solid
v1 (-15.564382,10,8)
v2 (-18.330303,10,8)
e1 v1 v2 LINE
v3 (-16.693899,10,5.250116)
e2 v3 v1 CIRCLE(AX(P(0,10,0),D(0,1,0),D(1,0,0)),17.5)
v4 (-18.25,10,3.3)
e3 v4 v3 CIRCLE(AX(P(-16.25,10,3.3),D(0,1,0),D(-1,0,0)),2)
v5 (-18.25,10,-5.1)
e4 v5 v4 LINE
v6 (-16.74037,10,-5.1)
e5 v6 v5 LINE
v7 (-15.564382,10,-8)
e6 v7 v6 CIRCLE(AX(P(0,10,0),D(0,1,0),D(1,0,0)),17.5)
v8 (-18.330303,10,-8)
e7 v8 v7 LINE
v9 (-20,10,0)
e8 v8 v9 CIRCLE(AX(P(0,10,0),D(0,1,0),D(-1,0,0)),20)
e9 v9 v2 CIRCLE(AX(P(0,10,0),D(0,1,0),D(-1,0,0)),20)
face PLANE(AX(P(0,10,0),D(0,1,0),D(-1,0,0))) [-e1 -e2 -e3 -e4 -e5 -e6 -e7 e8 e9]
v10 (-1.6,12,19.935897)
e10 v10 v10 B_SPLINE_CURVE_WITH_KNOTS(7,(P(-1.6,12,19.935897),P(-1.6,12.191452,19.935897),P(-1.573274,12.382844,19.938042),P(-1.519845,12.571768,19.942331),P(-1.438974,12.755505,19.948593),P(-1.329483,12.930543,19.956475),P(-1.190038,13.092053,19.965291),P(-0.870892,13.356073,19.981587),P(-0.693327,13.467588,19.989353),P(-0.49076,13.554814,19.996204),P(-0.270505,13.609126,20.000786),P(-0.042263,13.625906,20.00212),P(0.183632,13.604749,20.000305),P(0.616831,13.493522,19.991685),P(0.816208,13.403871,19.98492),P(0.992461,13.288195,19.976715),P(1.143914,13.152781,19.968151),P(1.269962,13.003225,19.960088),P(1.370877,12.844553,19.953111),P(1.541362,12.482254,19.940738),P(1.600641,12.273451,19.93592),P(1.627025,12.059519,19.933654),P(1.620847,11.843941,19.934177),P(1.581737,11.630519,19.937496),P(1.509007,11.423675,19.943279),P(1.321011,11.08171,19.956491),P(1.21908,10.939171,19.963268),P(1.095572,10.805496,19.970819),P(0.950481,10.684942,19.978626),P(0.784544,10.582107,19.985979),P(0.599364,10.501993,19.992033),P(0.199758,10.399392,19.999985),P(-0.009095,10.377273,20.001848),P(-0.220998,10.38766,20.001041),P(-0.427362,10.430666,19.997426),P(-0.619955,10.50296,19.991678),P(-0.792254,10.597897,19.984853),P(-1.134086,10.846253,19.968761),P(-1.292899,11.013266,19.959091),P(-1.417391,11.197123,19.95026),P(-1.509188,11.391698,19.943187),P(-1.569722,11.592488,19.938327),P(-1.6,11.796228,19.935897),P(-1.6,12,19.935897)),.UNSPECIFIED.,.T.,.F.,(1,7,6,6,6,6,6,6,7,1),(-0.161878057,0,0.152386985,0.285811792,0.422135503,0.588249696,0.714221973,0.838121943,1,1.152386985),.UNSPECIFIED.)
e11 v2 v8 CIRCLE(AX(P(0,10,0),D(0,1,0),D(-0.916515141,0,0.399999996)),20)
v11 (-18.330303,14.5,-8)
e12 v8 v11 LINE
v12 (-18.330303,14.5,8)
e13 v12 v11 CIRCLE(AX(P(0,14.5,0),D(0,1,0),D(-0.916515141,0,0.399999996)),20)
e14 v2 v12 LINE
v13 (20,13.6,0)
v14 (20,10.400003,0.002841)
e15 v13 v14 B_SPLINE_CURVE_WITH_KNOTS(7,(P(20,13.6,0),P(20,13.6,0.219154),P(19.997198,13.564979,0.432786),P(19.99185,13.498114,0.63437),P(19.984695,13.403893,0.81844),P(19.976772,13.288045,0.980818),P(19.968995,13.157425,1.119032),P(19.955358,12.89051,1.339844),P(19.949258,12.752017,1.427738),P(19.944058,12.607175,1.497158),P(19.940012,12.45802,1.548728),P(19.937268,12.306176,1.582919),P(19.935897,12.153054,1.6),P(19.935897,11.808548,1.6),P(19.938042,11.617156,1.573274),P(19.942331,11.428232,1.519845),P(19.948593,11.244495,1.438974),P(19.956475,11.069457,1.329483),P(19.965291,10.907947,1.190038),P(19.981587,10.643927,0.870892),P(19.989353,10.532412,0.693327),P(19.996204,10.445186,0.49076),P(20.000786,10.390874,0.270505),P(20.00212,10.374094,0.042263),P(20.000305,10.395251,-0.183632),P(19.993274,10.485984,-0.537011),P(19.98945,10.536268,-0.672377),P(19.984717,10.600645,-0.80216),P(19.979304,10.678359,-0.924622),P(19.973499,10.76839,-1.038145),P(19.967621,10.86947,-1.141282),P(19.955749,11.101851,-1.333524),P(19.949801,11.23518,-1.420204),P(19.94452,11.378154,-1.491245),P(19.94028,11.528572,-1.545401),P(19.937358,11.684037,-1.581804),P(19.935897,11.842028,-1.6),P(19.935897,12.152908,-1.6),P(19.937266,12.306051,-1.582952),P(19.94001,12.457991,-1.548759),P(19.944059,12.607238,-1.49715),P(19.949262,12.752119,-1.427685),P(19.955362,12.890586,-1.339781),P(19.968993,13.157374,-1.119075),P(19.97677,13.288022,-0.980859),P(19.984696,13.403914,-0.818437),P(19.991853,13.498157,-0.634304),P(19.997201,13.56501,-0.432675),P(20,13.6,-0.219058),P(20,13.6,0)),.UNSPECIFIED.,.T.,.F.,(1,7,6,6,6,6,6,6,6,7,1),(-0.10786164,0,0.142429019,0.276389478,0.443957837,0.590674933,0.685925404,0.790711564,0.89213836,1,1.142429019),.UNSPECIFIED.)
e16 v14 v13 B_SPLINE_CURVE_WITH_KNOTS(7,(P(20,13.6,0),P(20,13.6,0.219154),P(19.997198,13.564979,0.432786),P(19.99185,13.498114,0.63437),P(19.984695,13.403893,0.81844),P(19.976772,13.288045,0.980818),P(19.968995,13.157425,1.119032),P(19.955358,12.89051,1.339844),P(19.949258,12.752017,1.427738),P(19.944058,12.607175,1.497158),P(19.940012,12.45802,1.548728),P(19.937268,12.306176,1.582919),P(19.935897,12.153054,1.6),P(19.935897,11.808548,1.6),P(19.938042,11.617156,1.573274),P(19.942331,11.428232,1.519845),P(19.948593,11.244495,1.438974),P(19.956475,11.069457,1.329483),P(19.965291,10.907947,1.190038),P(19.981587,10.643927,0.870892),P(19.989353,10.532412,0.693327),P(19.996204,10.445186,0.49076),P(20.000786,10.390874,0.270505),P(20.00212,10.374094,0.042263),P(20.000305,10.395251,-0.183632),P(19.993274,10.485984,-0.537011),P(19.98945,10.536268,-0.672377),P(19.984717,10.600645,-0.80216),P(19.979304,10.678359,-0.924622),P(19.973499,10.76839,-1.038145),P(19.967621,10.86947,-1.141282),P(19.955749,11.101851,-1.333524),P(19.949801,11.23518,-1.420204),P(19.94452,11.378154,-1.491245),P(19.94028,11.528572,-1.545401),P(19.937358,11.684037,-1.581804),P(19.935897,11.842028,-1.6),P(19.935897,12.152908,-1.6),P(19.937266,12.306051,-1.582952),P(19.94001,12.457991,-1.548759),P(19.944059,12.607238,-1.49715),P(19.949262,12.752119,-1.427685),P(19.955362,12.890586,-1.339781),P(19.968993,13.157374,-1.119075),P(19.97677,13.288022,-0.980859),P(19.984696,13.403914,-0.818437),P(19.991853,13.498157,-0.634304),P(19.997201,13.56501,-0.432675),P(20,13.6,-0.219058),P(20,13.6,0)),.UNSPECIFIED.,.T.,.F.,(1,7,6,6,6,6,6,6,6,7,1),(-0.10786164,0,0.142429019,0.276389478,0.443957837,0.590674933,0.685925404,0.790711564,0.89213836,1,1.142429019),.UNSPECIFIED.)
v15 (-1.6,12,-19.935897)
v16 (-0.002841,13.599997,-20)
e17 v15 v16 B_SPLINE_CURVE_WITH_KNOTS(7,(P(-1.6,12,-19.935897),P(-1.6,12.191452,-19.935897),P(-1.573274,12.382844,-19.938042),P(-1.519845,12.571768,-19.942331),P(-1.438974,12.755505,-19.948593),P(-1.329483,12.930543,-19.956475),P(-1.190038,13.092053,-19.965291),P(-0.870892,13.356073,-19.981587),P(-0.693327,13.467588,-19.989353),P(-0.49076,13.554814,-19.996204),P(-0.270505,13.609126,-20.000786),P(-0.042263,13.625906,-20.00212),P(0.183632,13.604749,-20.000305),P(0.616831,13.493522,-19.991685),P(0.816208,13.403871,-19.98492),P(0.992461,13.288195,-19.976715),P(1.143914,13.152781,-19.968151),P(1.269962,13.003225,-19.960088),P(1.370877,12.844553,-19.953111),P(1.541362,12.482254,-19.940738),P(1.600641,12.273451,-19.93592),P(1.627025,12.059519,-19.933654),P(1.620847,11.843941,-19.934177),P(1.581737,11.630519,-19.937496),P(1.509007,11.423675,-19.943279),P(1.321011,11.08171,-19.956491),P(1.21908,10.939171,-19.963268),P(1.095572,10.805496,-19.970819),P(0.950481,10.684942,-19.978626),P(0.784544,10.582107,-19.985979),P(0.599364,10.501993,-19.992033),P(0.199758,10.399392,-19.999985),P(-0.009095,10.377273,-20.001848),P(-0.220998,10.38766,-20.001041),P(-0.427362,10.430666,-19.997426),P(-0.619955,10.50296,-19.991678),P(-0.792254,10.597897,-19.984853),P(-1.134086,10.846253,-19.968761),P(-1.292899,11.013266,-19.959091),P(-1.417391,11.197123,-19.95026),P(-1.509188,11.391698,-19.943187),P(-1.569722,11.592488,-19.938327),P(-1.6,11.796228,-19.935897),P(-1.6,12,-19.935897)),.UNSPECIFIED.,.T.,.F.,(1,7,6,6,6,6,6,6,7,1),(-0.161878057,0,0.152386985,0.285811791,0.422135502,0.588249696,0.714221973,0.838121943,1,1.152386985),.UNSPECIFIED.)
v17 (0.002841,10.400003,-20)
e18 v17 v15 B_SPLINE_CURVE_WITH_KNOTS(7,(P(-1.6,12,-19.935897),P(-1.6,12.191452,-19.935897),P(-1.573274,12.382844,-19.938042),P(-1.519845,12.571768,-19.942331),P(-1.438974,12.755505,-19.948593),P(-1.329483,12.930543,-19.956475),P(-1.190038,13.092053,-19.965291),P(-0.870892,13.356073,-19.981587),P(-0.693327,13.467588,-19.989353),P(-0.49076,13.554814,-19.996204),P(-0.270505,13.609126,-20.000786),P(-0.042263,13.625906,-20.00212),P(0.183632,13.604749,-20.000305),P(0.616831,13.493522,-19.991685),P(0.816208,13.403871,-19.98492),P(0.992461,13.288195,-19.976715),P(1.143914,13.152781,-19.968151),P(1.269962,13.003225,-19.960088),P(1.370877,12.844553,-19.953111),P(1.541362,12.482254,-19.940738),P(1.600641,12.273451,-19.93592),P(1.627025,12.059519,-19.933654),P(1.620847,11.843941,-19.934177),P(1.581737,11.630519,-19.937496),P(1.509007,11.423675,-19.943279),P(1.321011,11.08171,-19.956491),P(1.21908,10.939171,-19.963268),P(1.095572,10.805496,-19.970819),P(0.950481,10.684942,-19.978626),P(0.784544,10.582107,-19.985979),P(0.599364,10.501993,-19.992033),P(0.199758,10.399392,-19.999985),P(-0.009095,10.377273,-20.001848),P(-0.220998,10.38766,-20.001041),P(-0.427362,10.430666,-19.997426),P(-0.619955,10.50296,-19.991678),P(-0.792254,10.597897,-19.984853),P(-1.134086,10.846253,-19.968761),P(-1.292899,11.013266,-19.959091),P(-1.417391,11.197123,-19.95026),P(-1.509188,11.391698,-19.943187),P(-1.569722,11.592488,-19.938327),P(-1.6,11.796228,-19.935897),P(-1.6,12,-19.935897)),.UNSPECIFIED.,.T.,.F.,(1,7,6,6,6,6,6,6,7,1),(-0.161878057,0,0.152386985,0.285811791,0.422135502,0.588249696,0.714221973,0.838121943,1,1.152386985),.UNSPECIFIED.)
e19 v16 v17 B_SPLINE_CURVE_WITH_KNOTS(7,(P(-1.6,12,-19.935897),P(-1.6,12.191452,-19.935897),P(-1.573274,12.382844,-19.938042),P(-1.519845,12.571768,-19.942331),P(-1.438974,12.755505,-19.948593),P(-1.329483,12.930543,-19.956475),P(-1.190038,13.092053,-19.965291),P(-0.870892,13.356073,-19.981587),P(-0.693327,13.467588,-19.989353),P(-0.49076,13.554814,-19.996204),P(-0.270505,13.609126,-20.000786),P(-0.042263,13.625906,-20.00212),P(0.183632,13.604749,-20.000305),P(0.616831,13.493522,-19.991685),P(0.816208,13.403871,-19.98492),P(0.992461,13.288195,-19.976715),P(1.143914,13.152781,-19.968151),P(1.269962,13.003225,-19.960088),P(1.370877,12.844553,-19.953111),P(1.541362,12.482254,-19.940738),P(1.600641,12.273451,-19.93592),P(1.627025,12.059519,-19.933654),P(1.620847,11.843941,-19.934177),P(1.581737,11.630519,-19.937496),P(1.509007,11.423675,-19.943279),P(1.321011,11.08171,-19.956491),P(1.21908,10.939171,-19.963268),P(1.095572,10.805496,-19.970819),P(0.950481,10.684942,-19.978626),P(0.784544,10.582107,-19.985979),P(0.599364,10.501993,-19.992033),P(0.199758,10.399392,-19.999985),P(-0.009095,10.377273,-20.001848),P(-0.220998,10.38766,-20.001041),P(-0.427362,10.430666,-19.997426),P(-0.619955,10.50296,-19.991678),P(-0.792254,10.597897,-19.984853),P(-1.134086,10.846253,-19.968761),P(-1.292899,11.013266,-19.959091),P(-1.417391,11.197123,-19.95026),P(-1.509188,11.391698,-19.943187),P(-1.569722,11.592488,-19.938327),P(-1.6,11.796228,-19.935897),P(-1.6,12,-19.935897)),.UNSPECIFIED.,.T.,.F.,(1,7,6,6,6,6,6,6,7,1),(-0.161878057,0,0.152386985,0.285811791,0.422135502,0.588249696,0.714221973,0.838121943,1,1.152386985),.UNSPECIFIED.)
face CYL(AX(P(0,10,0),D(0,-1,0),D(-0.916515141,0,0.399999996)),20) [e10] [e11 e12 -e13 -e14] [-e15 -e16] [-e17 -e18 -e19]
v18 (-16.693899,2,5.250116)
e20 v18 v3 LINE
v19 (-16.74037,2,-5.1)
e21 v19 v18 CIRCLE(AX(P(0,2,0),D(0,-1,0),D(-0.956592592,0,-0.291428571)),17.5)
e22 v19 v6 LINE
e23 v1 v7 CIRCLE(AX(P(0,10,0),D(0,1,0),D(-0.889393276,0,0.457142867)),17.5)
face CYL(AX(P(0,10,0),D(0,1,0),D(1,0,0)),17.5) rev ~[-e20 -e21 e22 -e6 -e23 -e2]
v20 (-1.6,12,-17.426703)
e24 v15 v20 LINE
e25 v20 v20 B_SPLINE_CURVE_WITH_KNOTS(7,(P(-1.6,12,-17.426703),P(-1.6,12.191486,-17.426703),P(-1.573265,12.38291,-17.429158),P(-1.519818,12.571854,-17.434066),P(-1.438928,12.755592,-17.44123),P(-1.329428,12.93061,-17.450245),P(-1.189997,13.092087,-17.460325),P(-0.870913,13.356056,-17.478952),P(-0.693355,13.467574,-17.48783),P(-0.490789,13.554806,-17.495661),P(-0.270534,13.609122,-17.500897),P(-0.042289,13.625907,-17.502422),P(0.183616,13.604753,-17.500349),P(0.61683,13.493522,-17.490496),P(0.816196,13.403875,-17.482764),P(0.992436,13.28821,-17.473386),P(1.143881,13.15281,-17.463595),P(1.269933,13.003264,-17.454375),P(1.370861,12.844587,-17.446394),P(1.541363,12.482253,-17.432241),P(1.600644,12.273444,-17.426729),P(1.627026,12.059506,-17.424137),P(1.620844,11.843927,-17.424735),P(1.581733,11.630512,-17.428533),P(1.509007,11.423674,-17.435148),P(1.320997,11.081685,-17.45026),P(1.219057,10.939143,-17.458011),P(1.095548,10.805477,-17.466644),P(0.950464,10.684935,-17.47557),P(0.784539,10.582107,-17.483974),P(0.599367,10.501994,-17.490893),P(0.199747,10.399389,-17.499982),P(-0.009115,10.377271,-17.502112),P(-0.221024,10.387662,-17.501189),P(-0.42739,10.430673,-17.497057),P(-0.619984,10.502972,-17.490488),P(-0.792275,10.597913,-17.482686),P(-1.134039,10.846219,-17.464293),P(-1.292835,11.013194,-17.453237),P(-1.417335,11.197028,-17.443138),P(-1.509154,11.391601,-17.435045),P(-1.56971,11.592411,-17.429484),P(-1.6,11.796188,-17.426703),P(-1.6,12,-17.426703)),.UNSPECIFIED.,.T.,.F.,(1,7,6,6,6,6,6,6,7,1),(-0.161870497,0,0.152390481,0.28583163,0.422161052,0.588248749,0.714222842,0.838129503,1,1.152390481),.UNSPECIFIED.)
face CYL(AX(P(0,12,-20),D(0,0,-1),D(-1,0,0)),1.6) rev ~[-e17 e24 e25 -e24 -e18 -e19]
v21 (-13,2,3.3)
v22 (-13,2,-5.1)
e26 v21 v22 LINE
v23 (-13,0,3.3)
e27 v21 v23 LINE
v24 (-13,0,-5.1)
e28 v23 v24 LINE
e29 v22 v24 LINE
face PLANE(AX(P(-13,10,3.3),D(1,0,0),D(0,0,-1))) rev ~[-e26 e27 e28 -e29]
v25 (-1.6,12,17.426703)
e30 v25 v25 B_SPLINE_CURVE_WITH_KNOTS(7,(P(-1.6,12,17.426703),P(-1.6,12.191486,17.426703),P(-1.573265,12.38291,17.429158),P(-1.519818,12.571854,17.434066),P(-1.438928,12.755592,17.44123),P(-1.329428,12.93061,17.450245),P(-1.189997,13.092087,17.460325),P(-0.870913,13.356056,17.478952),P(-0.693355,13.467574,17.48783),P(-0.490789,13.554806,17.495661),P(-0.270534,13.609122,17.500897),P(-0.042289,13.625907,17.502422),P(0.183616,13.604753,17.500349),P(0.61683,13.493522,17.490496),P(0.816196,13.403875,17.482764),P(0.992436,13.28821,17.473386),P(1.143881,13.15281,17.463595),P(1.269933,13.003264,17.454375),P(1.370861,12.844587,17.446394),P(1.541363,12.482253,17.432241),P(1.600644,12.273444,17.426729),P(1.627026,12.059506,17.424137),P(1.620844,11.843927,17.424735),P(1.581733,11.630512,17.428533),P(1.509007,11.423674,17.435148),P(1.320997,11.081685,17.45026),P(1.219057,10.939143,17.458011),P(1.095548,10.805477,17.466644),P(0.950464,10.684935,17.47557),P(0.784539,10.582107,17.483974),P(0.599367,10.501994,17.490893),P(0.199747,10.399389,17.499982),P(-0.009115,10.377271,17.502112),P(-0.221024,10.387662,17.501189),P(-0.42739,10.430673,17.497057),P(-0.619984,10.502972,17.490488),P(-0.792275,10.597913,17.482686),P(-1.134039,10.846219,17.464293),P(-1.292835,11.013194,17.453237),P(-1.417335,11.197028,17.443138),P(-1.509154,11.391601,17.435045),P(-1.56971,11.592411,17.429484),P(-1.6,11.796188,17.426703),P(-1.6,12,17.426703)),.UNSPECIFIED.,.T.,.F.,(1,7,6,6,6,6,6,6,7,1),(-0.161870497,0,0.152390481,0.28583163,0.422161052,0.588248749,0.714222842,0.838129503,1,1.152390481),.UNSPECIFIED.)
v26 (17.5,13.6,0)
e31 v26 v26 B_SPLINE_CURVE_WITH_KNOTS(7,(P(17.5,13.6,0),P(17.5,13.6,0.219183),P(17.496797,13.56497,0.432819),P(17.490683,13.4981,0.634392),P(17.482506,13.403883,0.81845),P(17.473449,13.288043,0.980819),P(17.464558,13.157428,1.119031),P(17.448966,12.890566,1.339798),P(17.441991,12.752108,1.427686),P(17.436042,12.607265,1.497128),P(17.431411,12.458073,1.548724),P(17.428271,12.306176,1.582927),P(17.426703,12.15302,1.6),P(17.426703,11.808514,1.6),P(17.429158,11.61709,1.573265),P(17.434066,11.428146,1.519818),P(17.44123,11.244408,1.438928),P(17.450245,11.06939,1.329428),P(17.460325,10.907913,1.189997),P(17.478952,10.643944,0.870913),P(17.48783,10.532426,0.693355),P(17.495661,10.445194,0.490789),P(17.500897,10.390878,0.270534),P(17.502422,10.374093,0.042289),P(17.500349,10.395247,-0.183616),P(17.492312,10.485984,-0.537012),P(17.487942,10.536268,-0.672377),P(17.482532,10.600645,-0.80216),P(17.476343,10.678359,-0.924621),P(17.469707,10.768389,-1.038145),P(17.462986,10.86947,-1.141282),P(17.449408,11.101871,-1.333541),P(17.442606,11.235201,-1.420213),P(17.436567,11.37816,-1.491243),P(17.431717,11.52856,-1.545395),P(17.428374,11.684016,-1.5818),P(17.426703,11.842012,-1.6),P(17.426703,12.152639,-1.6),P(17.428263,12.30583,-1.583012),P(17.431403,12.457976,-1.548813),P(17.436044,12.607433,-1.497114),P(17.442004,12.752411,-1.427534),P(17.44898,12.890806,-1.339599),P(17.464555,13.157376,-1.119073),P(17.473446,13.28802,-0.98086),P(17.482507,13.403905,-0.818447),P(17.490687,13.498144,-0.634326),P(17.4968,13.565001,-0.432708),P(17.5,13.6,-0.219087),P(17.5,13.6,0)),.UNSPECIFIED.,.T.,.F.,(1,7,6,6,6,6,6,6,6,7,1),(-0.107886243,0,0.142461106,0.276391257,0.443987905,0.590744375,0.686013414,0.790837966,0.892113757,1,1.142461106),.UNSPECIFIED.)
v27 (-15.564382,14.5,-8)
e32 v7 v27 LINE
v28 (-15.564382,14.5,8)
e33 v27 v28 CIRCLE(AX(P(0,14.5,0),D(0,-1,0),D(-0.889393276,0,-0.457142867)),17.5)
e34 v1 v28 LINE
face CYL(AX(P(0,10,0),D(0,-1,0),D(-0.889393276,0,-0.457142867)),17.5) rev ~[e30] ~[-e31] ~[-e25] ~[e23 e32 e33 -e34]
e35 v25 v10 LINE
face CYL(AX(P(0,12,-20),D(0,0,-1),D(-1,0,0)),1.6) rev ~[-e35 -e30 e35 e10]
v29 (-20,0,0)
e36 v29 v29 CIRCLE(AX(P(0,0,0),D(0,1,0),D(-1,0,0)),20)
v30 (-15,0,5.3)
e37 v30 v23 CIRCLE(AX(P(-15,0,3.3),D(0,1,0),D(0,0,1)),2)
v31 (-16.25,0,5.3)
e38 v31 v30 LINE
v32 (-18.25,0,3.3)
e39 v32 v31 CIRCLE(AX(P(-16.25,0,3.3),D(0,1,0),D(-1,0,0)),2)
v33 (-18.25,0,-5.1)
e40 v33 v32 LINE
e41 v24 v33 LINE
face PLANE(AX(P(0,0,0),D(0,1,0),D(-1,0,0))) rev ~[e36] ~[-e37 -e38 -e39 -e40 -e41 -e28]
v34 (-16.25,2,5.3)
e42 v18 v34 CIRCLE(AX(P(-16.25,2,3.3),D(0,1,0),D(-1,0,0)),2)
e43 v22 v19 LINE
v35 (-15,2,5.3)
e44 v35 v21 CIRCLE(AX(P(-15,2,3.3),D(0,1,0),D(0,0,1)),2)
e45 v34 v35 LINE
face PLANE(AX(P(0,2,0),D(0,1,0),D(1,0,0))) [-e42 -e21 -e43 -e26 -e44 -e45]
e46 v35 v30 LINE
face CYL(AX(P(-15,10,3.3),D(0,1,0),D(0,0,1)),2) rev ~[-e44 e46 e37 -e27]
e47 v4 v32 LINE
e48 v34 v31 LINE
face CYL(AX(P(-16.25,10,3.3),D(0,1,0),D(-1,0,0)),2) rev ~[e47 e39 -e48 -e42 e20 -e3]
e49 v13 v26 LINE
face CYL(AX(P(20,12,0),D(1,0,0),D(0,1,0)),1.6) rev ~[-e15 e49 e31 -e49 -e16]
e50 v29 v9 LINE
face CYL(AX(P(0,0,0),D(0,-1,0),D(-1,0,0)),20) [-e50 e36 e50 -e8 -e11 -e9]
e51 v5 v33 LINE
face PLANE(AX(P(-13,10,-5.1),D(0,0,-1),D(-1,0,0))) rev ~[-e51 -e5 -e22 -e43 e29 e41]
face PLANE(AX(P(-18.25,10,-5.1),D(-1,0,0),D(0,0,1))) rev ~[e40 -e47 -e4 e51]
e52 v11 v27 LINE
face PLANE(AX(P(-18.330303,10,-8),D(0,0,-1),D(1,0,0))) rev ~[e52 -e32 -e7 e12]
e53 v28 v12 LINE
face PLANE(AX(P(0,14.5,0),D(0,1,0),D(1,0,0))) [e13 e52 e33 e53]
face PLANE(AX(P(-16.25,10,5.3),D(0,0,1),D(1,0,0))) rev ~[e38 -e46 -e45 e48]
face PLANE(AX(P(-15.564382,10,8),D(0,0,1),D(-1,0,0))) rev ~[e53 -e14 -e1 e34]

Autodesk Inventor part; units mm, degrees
ref_plane "YZ Plane" through (0, 0, 0) normal (1, 0, 0) x (0, 1, 0)
sketch "Sketch1" plane through (0, 0, 0) normal (0, 1, 0) x (-1, 0, 0)
  circle A0 centre (0, 0) radius 20
  dimension "d0" = 40
sketch "Sketch1 outline for Extrusion1" plane through (0, 0, 0) normal (0, 1, 0) x (-1, 0, 0)
  circle A0 centre (0, 0) radius 20
extrude "Extrusion1" add sketch "Sketch1 outline for Extrusion1" along normal blind 10
sketch "Sketch2" plane through (0, 10, 0) normal (0, 1, 0) x (1, 0, 0)
  circle A0 centre (0, 0) radius 17.5
  circle A1 centre (0, 0) radius 20
  line L0 (-18.330303, 8) -> (-15.564382, 8)
  line L1 (-18.330303, -8) -> (-15.564382, -8)
  circle A2 centre (0, 0) radius 20
  point P0 (-16.947343, 8)
  dimension "d3" = 35
  dimension "d4" = 8
  dimension "d5" = 8
  dimension "d6" = 40
sketch "Sketch2 outline for Extrusion2" plane through (0, 10, 0) normal (0, 1, 0) x (1, 0, 0)
  line L0 (-15.564382, -8) -> (-18.330303, -8)
  arc A0 (-15.564382, 8) -> (-15.564382, -8) centre (0, 0) cw
  line L1 (-18.330303, 8) -> (-15.564382, 8)
  arc A1 (-18.330303, -8) -> (-18.330303, 8) centre (0, 0) ccw
extrude "Extrusion2" add sketch "Sketch2 outline for Extrusion2" along normal blind 4.5
sketch "Sketch3" plane through (0, 10, 0) normal (0, 1, 0) x (1, 0, 0)
  circle A0 centre (0, 0) radius 17.5
sketch "Sketch3 outline for Extrusion3" plane through (0, 10, 0) normal (0, 1, 0) x (1, 0, 0)
  circle A0 centre (0, 0) radius 17.5
extrude "Extrusion3" cut sketch "Sketch3 outline for Extrusion3" against normal blind 8
sketch "Sketch4" plane through (0, 14.5, 0) normal (0, 1, 0) x (1, 0, 0)
  circle A0 centre (0, 0) radius 20 projected
  point P0 (0, -20.035453)
  point P1 (20, 0)
  point P2 (0, 20)
ref_plane "Work Plane1" through (20, 14.5, 0) normal (1, 0, 0) x (0, 1, 0)
sketch "Sketch5" plane through (20, 14.5, 0) normal (1, 0, 0) x (0, 1, 0)
  circle A0 centre (-2.5, 0) radius 1.6
  line L0 (0, -20) -> (0, 20) projected
  point P0 (-14.5, 0)
  point P1 (0, 8)
  point P2 (0, -8)
  dimension "d11" = 3.2
  dimension "d12" = 2.5
sketch "Sketch5 outline for Extrusion4" plane through (20, 14.5, 0) normal (1, 0, 0) x (0, 1, 0)
  circle A0 centre (-2.5, 0) radius 1.6
extrude "Extrusion4" cut sketch "Sketch5 outline for Extrusion4" against normal up to surface
ref_plane "Work Plane2" through (0, 14.5, -20) normal (0, 0, -1) x (-1, 0, 0)
sketch "Sketch6" plane through (0, 14.5, -20) normal (0, 0, -1) x (-1, 0, 0)
  circle A0 centre (0, -2.5) radius 1.6
  line L0 (18.330303, 0) -> (-20, 0)
  point P0 (0, -14.5)
  dimension "d15" = 3.2
  dimension "d16" = 2.5
sketch "Sketch6 outline for Extrusion5" plane through (0, 14.5, -20) normal (0, 0, -1) x (-1, 0, 0)
  circle A0 centre (0, -2.5) radius 1.6
extrude "Extrusion5" cut sketch "Sketch6 outline for Extrusion5" against normal through all
sketch "Sketch7" plane through (0, 10, 0) normal (0, 1, 0) x (1, 0, 0)
  line L0 (-13, -3.3) -> (-13, 5.1)
  line L1 (-13, 5.1) -> (-18.25, 5.1)
  line L2 (-18.25, 5.1) -> (-18.25, -3.3)
  line L3 (-16.25, -5.3) -> (-15, -5.3)
  arc A0 (-15, -5.3) -> (-13, -3.3) centre (-15, -3.3) ccw
  arc A1 (-18.25, -3.3) -> (-16.25, -5.3) centre (-16.25, -3.3) ccw
  arc A2 (-18.330303, 8) -> (-18.330303, -8) centre (0, 0) ccw
  point P0 (-18.25, -5.3)
  dimension "d19" = 10.4
  dimension "d20" = 5.25
  dimension "d21" = 2
  dimension "d25" = 18.25
  dimension "d26" = 5.1
sketch "Sketch7 outline for Extrusion6" plane through (0, 10, 0) normal (0, 1, 0) x (1, 0, 0)
  line L0 (-13, -3.3) -> (-13, 5.1)
  arc A0 (-15, -5.3) -> (-13, -3.3) centre (-15, -3.3) ccw
  line L1 (-16.25, -5.3) -> (-15, -5.3)
  arc A1 (-18.25, -3.3) -> (-16.25, -5.3) centre (-16.25, -3.3) ccw
  line L2 (-18.25, 5.1) -> (-18.25, -3.3)
  line L3 (-13, 5.1) -> (-18.25, 5.1)
extrude "Extrusion6" cut sketch "Sketch7 outline for Extrusion6" against normal through all
properties part number "Payload Adapter"
